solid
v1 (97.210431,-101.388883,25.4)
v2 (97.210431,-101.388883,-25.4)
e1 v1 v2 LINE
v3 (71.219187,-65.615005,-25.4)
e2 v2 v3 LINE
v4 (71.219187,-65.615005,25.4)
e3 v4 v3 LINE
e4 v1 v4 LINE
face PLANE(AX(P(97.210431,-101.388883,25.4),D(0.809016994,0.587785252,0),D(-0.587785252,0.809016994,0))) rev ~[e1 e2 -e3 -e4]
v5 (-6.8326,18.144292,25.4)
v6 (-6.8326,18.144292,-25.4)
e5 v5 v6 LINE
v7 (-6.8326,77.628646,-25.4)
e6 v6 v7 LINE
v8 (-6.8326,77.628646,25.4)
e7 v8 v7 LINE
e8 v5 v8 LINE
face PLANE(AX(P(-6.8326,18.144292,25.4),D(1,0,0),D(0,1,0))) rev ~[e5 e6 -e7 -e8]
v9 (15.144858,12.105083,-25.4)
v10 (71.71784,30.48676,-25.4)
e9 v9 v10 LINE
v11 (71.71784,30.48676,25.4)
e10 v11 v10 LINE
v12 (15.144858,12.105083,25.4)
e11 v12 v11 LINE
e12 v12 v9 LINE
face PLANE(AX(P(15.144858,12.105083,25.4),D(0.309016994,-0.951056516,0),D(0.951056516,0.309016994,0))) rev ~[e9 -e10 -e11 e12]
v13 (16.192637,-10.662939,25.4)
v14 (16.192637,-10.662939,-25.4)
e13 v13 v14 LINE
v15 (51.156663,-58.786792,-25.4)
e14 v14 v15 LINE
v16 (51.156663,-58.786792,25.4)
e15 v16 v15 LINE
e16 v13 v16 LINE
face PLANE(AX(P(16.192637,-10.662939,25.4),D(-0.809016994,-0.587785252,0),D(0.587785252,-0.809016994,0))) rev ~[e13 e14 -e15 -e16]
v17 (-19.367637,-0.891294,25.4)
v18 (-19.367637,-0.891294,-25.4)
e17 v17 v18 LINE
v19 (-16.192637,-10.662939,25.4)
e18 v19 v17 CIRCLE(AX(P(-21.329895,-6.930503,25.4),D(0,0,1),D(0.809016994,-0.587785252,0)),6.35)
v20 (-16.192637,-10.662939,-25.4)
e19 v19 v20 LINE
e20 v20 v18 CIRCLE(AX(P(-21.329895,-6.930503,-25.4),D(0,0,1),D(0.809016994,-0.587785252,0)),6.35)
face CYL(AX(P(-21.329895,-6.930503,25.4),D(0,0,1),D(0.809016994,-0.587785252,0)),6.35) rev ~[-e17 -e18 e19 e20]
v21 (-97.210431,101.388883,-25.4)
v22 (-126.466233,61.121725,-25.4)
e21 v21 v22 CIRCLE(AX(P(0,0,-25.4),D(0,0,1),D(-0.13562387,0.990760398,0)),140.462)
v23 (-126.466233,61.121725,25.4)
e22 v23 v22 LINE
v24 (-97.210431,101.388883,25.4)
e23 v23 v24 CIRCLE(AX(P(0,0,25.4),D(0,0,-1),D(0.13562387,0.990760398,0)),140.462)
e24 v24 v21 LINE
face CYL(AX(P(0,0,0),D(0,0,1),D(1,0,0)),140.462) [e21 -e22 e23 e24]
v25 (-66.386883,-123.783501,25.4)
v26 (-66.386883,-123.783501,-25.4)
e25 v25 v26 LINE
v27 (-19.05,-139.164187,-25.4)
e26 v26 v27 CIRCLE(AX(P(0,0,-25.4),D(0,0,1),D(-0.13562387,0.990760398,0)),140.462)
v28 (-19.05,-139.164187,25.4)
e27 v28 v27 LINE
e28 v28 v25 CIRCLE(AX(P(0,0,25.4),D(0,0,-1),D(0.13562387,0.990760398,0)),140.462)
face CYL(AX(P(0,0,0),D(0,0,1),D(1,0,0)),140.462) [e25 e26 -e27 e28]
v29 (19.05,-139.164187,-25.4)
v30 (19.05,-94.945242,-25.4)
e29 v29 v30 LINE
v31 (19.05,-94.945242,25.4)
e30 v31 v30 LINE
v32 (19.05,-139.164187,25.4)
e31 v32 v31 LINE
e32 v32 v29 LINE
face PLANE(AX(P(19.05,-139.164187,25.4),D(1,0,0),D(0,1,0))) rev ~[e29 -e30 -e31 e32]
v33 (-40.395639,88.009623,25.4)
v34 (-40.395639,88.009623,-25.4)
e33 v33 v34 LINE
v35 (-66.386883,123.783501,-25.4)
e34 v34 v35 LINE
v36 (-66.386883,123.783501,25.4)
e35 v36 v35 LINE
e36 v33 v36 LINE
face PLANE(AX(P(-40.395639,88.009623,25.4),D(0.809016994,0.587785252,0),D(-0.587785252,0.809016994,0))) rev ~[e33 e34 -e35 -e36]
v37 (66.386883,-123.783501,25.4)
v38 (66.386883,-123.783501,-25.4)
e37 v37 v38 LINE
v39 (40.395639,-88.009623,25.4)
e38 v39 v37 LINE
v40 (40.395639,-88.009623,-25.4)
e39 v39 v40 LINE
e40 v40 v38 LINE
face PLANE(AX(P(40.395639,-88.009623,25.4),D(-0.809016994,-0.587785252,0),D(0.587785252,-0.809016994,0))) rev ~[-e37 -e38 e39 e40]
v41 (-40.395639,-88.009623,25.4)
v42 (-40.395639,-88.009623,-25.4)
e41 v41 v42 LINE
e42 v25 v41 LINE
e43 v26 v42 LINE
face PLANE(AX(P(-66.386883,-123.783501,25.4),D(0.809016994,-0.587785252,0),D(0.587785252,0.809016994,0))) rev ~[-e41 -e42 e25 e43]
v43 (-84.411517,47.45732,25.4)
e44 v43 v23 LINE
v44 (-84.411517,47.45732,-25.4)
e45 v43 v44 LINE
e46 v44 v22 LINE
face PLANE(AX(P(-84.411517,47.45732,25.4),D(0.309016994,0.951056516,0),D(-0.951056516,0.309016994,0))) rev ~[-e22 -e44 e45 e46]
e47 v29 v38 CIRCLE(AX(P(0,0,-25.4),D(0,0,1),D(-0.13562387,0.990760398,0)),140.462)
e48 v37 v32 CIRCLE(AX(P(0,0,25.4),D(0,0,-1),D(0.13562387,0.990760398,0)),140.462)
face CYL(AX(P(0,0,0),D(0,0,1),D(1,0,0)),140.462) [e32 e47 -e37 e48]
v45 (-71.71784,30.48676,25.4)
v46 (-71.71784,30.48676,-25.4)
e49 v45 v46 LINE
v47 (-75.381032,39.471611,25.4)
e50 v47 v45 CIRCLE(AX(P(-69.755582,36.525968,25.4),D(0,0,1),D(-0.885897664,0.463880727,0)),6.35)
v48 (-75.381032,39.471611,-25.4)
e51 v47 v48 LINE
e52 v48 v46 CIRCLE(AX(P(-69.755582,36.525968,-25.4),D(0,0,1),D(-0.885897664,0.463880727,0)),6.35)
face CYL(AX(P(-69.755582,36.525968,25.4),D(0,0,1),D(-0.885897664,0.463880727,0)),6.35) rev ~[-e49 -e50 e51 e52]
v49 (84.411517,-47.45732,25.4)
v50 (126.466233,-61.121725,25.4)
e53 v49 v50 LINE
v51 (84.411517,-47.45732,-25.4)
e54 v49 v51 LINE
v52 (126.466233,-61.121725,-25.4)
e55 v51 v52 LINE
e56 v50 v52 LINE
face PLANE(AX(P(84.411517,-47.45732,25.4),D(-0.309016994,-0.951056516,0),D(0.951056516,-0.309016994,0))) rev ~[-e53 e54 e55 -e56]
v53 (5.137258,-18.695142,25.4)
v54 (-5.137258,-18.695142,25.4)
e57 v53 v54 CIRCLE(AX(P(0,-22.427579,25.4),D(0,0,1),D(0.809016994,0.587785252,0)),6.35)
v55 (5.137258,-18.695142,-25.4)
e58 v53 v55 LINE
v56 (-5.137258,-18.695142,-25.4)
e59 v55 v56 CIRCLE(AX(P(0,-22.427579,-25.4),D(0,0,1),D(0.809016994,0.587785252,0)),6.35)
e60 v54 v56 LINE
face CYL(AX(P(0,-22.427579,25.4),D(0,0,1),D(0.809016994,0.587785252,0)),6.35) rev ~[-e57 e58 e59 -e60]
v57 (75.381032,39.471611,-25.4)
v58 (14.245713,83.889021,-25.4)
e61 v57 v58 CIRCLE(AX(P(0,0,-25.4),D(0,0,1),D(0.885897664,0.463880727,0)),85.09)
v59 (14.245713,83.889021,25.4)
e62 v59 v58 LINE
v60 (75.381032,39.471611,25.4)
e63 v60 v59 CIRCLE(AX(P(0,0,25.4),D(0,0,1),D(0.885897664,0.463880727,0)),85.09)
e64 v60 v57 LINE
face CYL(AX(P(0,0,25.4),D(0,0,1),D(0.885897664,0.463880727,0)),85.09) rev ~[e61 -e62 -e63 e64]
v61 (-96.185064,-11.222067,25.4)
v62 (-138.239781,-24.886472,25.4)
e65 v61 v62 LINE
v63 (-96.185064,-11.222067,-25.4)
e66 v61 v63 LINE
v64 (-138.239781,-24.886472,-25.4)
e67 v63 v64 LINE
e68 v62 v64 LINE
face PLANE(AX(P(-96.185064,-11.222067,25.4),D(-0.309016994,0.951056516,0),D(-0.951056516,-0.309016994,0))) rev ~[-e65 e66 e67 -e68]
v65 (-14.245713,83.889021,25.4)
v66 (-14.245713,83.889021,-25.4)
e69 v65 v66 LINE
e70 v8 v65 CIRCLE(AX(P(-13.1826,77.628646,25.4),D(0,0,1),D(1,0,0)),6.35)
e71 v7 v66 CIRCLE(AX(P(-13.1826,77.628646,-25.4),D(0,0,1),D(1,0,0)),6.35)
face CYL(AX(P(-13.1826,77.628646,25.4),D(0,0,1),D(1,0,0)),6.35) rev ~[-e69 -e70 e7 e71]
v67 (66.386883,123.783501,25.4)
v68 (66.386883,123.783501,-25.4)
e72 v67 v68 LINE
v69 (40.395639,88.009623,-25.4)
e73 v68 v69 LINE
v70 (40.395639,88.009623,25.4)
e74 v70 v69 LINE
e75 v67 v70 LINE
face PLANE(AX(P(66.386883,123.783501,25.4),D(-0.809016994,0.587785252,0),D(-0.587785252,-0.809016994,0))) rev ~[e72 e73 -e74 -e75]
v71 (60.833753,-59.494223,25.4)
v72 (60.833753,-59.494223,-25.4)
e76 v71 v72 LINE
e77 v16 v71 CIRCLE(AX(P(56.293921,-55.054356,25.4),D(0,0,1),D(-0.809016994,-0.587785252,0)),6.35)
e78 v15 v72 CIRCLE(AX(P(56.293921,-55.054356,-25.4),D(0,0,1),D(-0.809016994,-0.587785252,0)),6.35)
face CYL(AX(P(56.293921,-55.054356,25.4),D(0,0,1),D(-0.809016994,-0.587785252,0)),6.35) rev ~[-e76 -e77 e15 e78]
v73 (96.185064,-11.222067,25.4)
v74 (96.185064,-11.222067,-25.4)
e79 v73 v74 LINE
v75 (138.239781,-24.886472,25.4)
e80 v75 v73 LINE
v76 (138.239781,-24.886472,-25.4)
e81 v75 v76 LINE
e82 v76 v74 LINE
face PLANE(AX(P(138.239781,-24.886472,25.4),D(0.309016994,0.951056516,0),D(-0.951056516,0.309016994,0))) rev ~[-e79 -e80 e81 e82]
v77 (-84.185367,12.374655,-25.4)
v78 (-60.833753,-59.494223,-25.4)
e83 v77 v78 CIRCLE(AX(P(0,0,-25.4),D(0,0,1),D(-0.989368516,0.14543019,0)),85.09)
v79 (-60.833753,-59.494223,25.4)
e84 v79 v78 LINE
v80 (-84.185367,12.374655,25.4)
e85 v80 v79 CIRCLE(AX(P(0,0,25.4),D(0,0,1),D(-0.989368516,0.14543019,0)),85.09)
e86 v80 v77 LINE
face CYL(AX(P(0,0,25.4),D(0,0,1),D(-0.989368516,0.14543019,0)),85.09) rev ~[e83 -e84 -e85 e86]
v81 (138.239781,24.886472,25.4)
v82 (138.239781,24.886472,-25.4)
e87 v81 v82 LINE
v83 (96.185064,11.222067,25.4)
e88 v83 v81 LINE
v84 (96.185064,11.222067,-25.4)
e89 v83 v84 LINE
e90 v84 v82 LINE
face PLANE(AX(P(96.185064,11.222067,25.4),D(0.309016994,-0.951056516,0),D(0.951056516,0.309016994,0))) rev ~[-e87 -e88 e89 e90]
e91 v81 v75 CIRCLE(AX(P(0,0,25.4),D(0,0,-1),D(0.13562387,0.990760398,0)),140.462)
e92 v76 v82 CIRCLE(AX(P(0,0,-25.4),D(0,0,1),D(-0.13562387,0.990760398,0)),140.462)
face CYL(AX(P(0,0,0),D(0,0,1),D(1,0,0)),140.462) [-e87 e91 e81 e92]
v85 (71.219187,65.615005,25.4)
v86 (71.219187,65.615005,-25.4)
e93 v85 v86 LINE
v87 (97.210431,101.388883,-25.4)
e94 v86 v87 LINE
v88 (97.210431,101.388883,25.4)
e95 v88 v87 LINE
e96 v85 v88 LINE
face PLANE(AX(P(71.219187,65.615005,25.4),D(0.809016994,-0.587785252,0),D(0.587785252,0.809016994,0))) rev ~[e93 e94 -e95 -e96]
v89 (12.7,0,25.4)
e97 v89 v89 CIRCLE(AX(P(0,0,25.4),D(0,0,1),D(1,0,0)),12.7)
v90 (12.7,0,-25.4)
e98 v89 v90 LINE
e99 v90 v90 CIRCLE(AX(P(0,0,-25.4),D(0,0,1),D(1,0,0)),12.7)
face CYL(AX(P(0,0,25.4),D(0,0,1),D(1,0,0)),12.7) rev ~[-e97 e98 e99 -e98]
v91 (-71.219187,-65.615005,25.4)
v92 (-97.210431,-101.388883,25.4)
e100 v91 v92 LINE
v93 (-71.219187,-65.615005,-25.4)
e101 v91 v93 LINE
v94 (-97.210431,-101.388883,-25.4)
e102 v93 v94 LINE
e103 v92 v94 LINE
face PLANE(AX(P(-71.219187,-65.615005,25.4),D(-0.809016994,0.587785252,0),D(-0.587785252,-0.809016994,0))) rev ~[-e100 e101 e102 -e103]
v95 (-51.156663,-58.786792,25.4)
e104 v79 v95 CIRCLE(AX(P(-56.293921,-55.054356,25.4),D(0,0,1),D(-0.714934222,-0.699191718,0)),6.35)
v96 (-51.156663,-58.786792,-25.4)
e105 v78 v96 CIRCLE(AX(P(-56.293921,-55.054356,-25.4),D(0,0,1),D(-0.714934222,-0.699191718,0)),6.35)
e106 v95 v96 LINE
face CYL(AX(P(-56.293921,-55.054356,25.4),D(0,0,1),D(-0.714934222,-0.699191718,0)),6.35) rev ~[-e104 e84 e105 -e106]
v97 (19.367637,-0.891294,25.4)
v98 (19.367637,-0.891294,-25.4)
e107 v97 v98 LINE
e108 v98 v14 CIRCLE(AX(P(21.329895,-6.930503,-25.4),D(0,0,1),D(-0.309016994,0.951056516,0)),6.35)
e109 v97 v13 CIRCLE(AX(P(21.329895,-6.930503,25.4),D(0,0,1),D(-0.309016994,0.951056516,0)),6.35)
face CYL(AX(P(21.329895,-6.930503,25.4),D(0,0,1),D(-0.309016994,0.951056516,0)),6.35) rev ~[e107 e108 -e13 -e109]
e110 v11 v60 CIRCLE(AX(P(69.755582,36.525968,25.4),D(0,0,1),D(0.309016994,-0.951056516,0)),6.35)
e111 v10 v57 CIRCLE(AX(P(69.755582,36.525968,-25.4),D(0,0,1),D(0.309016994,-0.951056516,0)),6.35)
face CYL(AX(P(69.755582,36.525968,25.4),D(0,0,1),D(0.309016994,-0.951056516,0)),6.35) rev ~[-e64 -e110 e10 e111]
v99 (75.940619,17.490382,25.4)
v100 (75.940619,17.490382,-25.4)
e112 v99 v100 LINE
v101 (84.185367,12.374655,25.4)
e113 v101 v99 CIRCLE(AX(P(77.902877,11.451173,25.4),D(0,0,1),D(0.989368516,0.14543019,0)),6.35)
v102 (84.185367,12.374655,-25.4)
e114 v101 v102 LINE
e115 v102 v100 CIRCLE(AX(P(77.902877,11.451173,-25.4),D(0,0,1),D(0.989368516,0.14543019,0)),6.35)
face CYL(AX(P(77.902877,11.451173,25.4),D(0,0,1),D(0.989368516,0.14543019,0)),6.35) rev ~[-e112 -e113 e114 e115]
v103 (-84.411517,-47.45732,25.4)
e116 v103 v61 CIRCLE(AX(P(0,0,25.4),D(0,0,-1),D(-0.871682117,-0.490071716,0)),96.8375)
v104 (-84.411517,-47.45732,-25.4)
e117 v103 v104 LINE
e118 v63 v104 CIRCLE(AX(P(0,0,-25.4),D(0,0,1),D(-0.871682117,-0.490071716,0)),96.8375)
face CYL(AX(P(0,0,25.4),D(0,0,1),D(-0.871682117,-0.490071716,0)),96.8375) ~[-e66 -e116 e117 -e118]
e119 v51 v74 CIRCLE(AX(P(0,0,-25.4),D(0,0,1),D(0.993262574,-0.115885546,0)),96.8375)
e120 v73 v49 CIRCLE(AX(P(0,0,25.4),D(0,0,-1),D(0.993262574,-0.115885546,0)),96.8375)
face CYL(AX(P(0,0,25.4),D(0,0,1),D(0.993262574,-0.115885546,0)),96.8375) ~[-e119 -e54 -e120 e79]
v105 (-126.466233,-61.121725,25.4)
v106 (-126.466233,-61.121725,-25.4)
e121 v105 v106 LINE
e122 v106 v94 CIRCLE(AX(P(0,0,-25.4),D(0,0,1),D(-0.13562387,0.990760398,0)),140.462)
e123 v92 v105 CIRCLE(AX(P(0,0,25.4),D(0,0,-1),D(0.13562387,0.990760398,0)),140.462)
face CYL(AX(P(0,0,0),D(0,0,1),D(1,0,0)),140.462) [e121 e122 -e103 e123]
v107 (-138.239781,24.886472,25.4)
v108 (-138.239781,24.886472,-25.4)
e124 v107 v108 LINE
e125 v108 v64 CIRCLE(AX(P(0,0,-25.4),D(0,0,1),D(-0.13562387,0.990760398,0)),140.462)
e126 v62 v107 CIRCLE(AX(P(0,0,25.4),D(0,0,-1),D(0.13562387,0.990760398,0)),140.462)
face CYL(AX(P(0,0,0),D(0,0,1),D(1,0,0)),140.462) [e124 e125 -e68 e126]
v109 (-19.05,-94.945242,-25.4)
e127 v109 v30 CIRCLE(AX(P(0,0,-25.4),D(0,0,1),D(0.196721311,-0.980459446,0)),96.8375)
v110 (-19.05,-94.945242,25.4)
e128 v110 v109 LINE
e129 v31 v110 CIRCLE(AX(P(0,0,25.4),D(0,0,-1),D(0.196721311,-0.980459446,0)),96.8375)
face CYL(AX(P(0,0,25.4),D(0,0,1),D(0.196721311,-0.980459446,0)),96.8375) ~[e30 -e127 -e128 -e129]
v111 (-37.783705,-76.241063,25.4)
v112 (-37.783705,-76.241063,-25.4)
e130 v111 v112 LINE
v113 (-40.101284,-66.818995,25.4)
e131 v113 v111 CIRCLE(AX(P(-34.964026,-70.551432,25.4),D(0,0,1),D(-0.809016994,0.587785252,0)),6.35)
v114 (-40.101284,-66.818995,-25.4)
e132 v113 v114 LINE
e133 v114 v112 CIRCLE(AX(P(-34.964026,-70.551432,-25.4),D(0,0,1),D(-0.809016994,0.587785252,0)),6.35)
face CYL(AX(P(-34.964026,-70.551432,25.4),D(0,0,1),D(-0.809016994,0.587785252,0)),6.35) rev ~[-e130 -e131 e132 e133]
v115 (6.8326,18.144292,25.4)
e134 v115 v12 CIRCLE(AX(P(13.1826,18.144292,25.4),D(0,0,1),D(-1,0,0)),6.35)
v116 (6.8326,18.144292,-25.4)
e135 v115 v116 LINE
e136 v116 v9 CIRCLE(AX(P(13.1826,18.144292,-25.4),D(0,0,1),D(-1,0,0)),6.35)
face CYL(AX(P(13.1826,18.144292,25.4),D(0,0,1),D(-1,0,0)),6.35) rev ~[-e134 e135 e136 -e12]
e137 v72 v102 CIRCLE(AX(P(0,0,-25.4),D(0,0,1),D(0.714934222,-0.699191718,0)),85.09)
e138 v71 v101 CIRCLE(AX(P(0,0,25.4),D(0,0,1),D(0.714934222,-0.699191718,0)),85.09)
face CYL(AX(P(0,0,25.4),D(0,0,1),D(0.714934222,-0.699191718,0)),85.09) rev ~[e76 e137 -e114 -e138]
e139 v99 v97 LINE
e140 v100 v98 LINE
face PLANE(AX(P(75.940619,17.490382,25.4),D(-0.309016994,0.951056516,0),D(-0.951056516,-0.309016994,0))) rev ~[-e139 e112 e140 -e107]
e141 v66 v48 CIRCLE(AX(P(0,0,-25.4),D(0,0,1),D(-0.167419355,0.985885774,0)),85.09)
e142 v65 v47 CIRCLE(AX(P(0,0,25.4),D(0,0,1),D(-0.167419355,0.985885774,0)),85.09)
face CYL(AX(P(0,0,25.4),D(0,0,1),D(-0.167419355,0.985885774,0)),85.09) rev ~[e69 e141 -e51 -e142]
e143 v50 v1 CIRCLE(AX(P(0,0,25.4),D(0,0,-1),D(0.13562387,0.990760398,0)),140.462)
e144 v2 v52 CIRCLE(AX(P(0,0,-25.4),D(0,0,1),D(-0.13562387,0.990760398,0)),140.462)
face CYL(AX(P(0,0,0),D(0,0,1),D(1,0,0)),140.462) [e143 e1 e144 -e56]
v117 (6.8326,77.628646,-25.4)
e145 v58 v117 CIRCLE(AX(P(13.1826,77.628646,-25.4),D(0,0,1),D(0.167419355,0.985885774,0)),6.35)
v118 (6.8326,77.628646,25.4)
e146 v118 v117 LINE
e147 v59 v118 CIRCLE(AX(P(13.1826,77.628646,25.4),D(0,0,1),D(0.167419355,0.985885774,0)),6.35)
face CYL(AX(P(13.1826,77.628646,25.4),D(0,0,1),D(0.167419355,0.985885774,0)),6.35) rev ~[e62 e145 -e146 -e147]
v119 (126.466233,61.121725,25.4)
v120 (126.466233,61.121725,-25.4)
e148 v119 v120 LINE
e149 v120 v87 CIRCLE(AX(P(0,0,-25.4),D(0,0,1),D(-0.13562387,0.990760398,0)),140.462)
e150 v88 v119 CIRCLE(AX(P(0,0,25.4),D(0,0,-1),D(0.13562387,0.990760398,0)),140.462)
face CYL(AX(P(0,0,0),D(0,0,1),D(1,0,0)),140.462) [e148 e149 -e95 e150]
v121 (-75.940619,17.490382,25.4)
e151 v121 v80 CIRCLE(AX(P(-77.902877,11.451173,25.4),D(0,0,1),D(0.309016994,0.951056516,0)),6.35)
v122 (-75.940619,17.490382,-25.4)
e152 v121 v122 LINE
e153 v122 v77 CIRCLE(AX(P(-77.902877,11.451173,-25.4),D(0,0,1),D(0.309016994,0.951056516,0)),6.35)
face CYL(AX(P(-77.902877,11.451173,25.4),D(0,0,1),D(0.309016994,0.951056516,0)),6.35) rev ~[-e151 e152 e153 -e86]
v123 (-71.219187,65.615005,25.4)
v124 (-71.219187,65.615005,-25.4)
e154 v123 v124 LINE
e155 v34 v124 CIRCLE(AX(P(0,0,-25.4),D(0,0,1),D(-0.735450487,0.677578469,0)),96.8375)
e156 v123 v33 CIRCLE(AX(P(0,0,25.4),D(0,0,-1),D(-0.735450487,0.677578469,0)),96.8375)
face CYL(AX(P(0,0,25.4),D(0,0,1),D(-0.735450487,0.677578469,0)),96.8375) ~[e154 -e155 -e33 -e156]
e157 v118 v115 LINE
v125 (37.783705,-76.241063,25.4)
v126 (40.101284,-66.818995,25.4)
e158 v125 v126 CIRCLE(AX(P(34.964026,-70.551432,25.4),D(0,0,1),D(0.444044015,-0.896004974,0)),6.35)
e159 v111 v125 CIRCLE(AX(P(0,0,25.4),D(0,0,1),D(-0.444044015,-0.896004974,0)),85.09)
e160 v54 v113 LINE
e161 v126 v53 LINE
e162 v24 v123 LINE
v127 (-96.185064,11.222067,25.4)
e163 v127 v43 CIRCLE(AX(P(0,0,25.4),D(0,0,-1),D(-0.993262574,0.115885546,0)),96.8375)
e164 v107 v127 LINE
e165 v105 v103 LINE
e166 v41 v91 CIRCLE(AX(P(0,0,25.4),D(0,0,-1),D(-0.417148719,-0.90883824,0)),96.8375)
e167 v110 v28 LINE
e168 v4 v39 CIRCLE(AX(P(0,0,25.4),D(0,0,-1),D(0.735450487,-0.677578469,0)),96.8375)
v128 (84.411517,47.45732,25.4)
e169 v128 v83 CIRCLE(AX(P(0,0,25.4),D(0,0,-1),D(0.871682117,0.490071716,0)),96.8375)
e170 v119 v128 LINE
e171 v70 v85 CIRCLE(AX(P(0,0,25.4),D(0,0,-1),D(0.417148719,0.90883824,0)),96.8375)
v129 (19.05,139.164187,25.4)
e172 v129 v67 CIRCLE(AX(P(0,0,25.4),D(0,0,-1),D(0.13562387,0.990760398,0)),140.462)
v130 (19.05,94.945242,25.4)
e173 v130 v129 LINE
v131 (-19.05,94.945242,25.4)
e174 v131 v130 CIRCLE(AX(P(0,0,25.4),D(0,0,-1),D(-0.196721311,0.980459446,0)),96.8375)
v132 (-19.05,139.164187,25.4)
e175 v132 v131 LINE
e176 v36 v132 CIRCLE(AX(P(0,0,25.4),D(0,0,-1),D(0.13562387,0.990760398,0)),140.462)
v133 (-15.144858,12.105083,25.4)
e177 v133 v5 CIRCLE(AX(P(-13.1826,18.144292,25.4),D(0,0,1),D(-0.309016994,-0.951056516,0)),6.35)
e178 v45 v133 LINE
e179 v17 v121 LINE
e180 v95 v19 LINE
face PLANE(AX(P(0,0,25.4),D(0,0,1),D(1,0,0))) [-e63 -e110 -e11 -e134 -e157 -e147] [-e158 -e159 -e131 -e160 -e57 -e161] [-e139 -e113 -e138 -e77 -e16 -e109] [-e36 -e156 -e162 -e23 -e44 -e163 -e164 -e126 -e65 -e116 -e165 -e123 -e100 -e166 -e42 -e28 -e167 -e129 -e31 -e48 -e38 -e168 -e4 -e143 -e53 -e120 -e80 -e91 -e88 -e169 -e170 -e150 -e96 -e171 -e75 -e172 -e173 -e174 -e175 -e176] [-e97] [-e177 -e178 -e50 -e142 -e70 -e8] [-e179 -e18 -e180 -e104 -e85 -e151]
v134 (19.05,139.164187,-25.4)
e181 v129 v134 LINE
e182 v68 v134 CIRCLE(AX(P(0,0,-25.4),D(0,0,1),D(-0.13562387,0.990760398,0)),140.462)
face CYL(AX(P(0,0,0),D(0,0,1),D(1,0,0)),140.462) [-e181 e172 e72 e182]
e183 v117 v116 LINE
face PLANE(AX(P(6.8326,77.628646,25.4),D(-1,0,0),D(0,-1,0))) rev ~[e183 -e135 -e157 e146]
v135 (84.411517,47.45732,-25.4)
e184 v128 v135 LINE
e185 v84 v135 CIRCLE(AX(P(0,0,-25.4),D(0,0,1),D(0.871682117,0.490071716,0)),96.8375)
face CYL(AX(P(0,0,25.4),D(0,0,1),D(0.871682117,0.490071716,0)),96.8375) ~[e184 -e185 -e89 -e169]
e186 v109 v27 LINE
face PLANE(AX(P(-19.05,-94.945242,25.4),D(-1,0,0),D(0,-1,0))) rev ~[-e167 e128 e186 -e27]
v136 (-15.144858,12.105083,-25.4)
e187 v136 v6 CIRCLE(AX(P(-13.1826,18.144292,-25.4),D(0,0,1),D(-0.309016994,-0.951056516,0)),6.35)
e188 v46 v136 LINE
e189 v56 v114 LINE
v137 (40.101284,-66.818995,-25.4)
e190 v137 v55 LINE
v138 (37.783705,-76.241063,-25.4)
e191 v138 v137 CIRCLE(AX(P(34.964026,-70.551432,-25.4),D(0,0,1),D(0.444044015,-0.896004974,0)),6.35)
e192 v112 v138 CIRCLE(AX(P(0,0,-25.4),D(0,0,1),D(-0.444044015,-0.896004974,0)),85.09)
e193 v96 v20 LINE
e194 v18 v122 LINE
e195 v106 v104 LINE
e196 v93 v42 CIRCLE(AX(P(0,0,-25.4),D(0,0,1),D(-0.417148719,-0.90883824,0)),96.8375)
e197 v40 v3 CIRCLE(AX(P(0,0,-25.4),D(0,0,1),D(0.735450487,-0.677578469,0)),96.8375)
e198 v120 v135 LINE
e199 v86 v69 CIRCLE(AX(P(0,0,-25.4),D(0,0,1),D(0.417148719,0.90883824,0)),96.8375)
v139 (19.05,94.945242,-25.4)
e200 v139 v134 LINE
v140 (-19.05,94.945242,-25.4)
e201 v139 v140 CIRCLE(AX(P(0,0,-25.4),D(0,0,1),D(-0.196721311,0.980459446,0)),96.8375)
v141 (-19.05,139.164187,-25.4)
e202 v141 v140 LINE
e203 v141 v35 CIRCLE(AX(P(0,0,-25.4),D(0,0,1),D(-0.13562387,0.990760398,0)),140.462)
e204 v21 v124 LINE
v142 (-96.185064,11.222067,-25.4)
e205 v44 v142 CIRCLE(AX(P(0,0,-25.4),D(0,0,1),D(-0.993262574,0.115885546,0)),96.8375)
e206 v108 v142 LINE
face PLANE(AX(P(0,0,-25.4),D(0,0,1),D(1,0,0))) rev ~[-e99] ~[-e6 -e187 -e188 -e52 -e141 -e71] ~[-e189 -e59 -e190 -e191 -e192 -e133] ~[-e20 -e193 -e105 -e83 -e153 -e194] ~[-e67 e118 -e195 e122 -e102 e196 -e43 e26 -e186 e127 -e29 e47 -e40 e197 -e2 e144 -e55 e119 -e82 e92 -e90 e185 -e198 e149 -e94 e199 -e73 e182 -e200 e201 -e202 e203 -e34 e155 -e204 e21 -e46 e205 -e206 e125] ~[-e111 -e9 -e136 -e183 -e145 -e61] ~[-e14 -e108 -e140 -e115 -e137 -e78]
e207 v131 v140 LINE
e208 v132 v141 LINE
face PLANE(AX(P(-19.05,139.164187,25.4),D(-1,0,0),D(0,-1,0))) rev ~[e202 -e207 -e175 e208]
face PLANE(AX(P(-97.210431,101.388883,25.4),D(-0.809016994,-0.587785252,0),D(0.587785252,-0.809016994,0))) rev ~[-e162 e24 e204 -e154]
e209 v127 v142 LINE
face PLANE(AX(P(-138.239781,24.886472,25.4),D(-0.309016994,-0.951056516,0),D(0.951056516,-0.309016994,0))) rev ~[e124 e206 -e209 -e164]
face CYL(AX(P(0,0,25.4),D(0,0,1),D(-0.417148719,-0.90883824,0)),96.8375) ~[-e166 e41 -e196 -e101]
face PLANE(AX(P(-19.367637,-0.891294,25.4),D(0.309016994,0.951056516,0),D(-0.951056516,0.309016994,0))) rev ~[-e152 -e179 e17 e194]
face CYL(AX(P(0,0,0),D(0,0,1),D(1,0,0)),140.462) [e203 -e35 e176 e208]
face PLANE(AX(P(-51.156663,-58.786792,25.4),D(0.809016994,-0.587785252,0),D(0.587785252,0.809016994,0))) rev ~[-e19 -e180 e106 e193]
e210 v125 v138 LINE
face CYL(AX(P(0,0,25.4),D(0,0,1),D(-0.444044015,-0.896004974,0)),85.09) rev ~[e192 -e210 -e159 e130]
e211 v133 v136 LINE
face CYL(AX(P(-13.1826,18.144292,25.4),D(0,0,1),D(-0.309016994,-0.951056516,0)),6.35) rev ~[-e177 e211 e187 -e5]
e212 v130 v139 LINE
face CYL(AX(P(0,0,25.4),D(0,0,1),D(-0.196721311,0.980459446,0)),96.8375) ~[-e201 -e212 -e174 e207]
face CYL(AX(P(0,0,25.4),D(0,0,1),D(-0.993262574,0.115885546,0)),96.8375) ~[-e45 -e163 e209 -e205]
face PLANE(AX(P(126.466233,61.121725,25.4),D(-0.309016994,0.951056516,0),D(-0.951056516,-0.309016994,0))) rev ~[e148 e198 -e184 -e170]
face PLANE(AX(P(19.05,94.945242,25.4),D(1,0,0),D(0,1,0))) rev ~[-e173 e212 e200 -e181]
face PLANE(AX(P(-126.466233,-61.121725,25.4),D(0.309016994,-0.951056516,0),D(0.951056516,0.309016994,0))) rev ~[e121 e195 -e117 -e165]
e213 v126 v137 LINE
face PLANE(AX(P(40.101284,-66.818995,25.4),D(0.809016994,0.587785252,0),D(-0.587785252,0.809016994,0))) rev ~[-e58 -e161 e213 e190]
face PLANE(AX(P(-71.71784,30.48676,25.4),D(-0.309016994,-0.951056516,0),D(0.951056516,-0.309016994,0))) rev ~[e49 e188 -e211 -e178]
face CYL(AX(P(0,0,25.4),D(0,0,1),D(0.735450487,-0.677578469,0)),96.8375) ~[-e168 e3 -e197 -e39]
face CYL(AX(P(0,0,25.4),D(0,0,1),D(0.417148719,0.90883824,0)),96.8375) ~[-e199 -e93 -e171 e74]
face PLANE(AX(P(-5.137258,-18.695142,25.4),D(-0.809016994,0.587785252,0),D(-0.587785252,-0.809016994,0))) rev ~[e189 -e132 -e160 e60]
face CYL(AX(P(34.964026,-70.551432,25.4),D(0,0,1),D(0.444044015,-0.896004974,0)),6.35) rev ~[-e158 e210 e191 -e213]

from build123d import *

# Parameters (mm, degrees)
F0_R            = 140.462
F1_DEPTH        = 25.4
F3_DEPTH        = 50.801
F3_COPIES_COUNT = 10
F6_DEPTH        = 50.801
F6_COPIES_COUNT = 5
F7_R            = 12.7
F8_DEPTH        = 50.801


# Not quite as in the source:
# - a pattern or mirror of a feature is missing from the dataset's text; its kind, count and spacing are read off the source's solid


with BuildPart() as f1:
    # F0 (on Top) → F1 (new body, symmetric)
    with BuildSketch(Plane.XY):
        Circle(F0_R)
    extrude(amount=F1_DEPTH, both=True)

    # F2 (on face) → F3 (cut, through all)
    with BuildSketch(Plane.XY.offset(25.4)):
        with BuildLine():
            ThreePointArc((-19.05, 94.9452416198), (0, 96.8375), (19.05, 94.9452416198))
            Line((19.05, 94.9452416198), (19.05, 139.1641870023))
            ThreePointArc((19.05, 139.1641870023), (0, 140.462), (-19.05, 139.1641870023))
            Line((-19.05, 139.1641870023), (-19.05, 94.9452416198))
        make_face()
    f3 = extrude(amount=-F3_DEPTH, mode=Mode.SUBTRACT)

    # F3_copies: F3 ×10 about axis
    f3_copies_axis = Axis((0, 0, 0), (0, 0, 1))
    for i in range(1, F3_COPIES_COUNT):
        add(f3.rotate(f3_copies_axis, i * 360 / F3_COPIES_COUNT), mode=Mode.SUBTRACT)

    # F5 (on face) → F6 (cut, through all)
    with BuildSketch(Plane.XY.offset(25.4)):
        with BuildLine():
            ThreePointArc((71.7178399755, 30.4867595727), (75.6356515828, 34.1286194106), (75.3810322275, 39.4716110682))
            ThreePointArc((75.3810322275, 39.4716110682), (50.0146471176, 68.8392560514), (14.2457129032, 83.8890205204))
            ThreePointArc((14.2457129032, 83.8890205204), (9.0855441629, 82.4801026945), (6.8326, 77.6286458547))
            Line((6.8326, 77.6286458547), (6.8326, 18.1442923048))
            ThreePointArc((6.8326, 18.1442923048), (9.4501636479, 13.0070343905), (15.1448579143, 12.1050834263))
            Line((15.1448579143, 12.1050834263), (71.7178399755, 30.4867595727))
        make_face()
    f6 = extrude(amount=-F6_DEPTH, mode=Mode.SUBTRACT)

    # F6_copies: F6 ×5 about axis
    f6_copies_axis = Axis((0, 0, 0), (0, 0, 1))
    for i in range(1, F6_COPIES_COUNT):
        add(f6.rotate(f6_copies_axis, i * 360 / F6_COPIES_COUNT), mode=Mode.SUBTRACT)

    # F7 (on face) → F8 (cut, through all)
    with BuildSketch(Plane.XY.offset(25.4)):
        Circle(F7_R)
    extrude(amount=-F8_DEPTH, mode=Mode.SUBTRACT)


solid = f1.part
